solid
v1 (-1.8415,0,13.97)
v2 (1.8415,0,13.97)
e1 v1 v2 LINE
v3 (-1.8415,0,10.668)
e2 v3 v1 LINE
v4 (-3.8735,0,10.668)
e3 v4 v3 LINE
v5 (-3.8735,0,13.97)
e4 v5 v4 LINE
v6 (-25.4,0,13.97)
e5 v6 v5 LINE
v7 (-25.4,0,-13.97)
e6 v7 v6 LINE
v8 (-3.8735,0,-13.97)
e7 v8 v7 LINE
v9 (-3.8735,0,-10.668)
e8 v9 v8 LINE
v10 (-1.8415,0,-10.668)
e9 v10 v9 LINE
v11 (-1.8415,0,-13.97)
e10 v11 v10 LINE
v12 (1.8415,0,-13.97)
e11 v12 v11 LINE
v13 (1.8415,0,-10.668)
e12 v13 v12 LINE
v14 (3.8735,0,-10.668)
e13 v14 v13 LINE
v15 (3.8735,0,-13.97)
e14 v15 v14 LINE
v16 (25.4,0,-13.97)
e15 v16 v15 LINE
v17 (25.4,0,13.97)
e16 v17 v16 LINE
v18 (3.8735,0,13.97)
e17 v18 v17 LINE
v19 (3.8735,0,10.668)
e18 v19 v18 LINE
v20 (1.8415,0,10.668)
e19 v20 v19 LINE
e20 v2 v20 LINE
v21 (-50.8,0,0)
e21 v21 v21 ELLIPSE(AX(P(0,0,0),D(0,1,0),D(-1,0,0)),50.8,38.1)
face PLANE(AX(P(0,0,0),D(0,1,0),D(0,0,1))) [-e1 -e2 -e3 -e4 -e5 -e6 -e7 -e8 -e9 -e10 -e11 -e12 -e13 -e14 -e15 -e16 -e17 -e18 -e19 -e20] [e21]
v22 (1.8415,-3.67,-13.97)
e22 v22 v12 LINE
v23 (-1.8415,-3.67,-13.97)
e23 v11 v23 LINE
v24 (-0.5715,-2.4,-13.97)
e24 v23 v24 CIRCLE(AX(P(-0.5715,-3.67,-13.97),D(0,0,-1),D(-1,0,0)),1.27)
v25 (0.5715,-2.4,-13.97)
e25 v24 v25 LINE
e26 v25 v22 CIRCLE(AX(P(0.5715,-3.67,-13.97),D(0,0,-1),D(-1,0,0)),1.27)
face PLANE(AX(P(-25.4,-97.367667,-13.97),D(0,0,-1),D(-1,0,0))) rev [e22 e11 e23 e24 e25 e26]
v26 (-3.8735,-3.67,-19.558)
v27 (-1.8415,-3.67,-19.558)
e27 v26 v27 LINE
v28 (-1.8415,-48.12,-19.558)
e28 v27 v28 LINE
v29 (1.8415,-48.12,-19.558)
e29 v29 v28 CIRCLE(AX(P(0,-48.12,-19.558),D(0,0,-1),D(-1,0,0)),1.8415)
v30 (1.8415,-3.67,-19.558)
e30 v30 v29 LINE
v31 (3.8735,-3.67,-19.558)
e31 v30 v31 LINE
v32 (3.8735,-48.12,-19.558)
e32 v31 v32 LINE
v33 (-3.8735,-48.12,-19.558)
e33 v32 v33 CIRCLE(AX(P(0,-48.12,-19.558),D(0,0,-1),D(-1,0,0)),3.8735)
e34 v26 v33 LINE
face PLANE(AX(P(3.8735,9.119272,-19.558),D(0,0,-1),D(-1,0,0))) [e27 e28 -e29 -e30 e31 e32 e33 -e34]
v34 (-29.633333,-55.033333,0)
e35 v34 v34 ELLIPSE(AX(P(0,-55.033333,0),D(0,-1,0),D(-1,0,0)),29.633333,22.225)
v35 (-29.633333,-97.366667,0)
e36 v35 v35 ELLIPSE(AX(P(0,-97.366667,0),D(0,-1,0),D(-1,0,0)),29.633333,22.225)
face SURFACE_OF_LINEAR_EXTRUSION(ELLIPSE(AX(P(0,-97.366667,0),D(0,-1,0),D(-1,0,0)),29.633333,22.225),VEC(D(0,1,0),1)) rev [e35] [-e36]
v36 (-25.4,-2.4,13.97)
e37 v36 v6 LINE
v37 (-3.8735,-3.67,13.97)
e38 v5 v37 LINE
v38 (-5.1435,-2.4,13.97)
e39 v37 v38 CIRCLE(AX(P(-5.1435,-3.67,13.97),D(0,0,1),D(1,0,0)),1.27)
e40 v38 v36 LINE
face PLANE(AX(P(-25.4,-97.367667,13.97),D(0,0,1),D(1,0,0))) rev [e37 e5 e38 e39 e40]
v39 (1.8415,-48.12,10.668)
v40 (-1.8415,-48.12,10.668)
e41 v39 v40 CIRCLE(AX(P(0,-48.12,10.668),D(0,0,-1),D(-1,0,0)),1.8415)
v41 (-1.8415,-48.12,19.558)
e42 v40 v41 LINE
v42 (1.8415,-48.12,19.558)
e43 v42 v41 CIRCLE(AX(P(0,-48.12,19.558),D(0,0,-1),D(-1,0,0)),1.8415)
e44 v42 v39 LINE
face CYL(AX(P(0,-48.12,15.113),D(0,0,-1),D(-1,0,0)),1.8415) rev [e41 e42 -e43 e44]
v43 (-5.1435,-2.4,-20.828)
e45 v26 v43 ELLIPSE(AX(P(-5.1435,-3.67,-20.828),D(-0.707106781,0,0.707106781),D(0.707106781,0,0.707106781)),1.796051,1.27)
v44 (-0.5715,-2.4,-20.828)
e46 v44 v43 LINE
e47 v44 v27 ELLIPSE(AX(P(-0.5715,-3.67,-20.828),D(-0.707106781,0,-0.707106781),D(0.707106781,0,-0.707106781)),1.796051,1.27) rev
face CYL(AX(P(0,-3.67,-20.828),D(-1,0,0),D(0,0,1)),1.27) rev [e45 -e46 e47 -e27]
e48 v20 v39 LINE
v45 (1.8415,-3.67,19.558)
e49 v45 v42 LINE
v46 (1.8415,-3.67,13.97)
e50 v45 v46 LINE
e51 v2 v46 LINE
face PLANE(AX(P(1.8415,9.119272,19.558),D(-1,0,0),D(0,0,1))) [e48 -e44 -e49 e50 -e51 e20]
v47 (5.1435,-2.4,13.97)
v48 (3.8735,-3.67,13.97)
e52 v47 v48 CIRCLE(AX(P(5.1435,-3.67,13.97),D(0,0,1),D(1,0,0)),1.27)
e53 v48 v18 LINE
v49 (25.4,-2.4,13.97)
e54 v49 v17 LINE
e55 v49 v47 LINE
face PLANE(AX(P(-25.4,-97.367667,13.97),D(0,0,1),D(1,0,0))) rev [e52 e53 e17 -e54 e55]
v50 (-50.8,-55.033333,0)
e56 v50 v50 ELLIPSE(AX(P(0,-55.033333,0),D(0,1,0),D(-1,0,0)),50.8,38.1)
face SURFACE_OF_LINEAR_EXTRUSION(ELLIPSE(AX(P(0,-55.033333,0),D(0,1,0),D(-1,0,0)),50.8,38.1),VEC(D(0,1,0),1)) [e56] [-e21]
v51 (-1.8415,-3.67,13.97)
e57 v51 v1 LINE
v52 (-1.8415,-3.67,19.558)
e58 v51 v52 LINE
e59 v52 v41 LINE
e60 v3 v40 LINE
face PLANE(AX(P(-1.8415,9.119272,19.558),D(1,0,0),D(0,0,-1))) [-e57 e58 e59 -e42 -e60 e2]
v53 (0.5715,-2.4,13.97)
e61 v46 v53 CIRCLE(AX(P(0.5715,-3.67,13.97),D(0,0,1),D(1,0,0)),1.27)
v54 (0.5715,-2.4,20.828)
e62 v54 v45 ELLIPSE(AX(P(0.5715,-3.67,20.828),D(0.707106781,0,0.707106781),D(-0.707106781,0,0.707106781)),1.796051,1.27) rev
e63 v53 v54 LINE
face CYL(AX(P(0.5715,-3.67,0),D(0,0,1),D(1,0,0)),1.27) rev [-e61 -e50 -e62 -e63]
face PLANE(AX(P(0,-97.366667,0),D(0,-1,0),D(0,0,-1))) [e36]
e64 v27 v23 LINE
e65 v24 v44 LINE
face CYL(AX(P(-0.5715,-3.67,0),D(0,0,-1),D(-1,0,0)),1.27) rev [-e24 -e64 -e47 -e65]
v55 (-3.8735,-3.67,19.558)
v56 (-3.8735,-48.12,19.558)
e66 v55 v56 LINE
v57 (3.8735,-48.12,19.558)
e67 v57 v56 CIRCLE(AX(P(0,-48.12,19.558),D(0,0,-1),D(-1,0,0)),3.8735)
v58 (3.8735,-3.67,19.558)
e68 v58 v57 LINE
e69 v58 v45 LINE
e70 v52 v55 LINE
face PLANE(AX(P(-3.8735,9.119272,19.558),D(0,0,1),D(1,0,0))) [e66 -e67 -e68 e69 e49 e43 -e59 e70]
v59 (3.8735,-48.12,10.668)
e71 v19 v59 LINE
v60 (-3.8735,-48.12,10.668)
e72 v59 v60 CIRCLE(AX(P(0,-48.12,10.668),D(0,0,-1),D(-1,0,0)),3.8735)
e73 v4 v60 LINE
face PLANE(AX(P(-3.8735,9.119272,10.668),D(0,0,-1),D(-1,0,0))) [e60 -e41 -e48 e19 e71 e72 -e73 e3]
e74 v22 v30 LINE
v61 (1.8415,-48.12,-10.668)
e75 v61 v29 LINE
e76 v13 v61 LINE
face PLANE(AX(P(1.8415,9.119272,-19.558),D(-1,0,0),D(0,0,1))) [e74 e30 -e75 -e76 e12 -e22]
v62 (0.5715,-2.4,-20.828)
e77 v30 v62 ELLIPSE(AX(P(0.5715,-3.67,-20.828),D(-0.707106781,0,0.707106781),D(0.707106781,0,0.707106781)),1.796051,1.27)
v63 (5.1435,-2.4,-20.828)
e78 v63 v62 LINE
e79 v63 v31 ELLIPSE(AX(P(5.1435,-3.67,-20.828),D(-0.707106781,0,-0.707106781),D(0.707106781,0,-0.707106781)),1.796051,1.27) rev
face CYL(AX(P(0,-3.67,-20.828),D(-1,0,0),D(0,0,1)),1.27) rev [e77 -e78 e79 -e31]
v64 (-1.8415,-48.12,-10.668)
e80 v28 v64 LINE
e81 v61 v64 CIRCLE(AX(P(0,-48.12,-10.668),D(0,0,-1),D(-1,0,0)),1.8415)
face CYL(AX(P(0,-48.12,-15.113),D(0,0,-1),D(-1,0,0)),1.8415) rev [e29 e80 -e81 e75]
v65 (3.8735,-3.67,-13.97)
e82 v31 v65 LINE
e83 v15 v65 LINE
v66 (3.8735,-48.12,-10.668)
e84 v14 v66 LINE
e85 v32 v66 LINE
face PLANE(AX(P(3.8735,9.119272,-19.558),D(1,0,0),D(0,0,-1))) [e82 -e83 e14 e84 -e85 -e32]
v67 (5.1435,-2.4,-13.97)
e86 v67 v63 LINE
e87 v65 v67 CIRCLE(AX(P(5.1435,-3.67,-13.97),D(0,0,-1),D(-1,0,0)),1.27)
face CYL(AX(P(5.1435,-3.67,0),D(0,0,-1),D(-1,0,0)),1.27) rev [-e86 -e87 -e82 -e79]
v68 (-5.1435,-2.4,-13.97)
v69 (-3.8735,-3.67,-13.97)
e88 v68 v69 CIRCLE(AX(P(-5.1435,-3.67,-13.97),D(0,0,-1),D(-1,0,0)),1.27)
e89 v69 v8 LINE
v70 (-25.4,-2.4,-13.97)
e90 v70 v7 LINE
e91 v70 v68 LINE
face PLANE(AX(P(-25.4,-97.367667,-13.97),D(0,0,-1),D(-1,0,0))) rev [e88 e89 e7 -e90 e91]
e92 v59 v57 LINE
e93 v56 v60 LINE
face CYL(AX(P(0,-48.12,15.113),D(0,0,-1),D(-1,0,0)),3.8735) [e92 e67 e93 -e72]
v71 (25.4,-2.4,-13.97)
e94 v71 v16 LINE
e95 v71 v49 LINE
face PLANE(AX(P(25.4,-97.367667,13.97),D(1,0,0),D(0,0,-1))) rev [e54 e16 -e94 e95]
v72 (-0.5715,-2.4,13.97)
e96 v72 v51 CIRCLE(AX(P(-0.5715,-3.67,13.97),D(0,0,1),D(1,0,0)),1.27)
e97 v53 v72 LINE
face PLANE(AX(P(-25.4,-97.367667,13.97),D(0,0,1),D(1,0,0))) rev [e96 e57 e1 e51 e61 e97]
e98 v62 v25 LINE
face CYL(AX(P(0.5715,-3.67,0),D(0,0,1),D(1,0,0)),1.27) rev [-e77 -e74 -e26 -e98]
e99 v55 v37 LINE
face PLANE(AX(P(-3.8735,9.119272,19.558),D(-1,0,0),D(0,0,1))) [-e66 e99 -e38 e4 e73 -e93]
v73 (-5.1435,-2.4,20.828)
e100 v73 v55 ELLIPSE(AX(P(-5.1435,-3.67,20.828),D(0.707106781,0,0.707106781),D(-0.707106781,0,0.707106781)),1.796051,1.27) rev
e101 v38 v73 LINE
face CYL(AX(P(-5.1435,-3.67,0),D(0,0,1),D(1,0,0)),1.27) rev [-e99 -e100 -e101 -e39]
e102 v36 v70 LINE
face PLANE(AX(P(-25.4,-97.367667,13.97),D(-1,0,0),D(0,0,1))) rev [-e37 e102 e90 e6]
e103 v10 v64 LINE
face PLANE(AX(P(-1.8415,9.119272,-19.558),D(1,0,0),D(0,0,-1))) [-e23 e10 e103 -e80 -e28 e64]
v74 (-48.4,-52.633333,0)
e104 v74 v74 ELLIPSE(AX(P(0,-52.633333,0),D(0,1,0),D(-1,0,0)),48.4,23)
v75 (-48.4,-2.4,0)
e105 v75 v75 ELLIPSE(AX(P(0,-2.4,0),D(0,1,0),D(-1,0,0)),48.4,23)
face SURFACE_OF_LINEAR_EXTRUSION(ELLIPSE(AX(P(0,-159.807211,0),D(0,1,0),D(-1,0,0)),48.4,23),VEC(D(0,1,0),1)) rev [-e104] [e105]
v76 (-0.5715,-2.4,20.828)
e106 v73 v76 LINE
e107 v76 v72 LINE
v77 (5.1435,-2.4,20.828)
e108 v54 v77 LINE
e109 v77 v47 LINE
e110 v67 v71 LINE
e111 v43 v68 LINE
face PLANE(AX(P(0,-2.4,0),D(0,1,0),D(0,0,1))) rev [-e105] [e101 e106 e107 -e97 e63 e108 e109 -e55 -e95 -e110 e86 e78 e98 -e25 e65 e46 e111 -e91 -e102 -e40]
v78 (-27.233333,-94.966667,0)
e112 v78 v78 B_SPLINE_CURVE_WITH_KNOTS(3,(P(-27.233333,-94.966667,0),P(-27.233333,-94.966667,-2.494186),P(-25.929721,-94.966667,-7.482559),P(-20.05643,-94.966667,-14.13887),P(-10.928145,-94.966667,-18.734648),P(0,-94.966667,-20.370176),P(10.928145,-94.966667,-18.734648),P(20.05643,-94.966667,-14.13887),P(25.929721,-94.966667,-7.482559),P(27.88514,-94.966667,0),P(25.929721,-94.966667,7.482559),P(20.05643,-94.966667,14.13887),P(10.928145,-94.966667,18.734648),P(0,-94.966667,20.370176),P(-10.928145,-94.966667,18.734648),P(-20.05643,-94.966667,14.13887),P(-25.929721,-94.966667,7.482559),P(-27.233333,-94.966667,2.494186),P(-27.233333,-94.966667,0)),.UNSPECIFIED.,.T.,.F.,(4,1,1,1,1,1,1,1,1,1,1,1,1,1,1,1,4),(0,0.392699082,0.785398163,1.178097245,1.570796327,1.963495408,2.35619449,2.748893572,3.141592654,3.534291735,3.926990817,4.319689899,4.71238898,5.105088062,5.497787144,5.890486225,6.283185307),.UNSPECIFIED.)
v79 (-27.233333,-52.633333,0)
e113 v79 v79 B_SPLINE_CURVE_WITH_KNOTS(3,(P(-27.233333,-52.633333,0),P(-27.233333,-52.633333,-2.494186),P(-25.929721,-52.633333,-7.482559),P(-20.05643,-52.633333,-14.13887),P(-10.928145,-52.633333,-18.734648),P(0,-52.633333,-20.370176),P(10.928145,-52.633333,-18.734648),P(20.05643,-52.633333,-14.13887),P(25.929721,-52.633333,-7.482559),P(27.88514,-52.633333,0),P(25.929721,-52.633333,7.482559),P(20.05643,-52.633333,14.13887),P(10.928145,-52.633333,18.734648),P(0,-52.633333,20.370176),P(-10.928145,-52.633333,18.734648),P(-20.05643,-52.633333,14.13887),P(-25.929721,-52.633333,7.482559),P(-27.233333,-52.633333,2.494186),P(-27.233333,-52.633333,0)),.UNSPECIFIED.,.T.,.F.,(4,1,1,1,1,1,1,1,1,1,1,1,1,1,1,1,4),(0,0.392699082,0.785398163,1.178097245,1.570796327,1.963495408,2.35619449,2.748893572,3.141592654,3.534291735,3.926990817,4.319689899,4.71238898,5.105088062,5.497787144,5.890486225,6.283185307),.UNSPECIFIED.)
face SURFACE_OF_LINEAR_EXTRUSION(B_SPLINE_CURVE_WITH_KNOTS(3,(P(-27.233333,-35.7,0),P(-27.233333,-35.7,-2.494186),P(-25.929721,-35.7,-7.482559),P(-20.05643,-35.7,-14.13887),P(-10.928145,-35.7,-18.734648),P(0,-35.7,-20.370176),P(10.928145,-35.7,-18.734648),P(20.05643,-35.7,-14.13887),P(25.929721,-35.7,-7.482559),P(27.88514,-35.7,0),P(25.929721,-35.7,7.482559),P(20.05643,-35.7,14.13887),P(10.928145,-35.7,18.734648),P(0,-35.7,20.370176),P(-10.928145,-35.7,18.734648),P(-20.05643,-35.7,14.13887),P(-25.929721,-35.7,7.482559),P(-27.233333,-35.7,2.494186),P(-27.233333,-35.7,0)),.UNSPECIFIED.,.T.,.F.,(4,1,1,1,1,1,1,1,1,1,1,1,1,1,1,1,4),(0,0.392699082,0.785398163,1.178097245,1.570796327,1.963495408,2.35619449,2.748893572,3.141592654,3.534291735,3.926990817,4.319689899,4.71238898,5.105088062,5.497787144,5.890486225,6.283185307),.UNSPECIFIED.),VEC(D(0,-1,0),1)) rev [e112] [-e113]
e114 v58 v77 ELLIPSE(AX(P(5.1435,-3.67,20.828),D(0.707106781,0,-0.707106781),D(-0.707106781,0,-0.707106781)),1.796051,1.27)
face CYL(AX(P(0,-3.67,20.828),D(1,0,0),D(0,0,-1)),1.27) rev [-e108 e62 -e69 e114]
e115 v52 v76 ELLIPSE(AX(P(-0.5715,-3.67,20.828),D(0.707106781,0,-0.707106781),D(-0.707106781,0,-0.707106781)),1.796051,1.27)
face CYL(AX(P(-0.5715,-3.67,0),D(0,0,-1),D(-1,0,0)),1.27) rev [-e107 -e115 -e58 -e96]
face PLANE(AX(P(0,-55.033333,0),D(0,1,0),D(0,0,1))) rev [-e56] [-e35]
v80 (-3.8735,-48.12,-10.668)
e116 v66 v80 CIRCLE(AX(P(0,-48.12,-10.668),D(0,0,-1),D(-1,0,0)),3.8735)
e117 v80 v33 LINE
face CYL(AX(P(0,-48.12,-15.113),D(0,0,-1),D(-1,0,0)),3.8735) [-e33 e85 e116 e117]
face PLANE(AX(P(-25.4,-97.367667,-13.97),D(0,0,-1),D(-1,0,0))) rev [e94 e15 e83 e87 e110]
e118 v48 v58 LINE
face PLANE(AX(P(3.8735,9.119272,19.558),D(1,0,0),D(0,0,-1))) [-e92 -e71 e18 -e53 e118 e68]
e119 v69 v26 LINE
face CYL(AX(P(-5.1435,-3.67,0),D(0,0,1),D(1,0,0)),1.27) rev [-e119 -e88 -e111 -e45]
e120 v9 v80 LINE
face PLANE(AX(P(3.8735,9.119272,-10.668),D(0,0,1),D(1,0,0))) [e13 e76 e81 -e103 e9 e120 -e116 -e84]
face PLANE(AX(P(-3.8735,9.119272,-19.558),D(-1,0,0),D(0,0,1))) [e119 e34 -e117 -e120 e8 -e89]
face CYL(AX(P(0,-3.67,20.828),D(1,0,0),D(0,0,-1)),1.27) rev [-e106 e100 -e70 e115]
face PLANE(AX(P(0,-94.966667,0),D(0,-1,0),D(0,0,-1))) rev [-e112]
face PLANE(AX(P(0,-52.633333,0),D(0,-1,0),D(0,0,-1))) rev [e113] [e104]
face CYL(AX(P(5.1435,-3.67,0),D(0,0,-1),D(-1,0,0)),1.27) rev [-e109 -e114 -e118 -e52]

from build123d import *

# Parameters (mm, degrees)
SKETCH3_RX          = 50.8
SKETCH3_RY          = 38.1
BOSS_EXTRUDE1_DEPTH = 55.033333333
SKETCH4_RX          = 29.633333333
SKETCH4_RY          = 22.224999873
BOSS_EXTRUDE2_DEPTH = 42.333333249
CUT_EXTRUDE1_START  = -50.233333
SKETCH5_RX          = 48.4
SKETCH5_RY          = 23
CUT_EXTRUDE1_DEPTH  = 50.233333
CUT_EXTRUDE2_START  = -42.333333249
CUT_EXTRUDE2_DEPTH  = 42.333333249
CUT_EXTRUDE3_REACH  = 118.243
SKETCH7_W           = 50.8
SKETCH7_H           = 27.94
BOSS_EXTRUDE3_START = -2.4
SKETCH8_W           = 2.032
SKETCH8_H           = 8.89
BOSS_EXTRUDE3_DEPTH = 48.12
SKETCH11_W          = 2.032
SKETCH11_H          = 8.89
FILLET1_R           = 1.27


# Read off the part's stored shape, not the designer's step: Cut-Extrude2
with BuildPart() as part:
    # Sketch3 → Boss-Extrude1 (new body)
    with BuildSketch(Plane(origin=(0, 0, 0), x_dir=(1, 0, 0), z_dir=(0, 1, 0))):
        with Locations(Location((0, 0), (0, 0, 180))):
            Ellipse(SKETCH3_RX, SKETCH3_RY)
    extrude(amount=-BOSS_EXTRUDE1_DEPTH)

    # Sketch4 → Boss-Extrude2 (add)
    with BuildSketch(Plane.XZ.offset(55.033333333)):
        with Locations(Location((0, 0), (0, 0, 180))):
            Ellipse(SKETCH4_RX, SKETCH4_RY)
    extrude(amount=BOSS_EXTRUDE2_DEPTH)

    # Sketch5 → Cut-Extrude1 (cut)
    with BuildSketch(Plane(origin=(0, -2.400000026, 0), x_dir=(1, 0, 0), z_dir=(0, 1, 0)).offset(CUT_EXTRUDE1_START)):
        with Locations(Location((0, 0), (0, 0, -180))):
            Ellipse(SKETCH5_RX, SKETCH5_RY)
    extrude(amount=CUT_EXTRUDE1_DEPTH, mode=Mode.SUBTRACT)

    # Cut-Extrude2 outline → Cut-Extrude2 (cut)
    with BuildSketch(Plane(origin=(0, -94.966666556, 0), x_dir=(-1, 0, 0), z_dir=(0, -1, 0)).offset(CUT_EXTRUDE2_START)):
        with BuildLine():
            add(Edge.make_bspline(
                [(27.233333333, 0), (27.233333333, 2.494186188), (25.929720695, 7.482558564), (20.056429993, 14.138870445), (10.928145061, 18.734648365), (0, 20.370175627), (-10.928145061, 18.734648365), (-20.056429993, 14.138870445), (-25.929720695, 7.482558564), (-27.885139653, 0), (-25.929720695, -7.482558564), (-20.056429993, -14.138870445), (-10.928145061, -18.734648365), (0, -20.370175627), (10.928145061, -18.734648365), (20.056429993, -14.138870445), (25.929720695, -7.482558564), (27.233333333, -2.494186188), (27.233333333, 0)],
                knots=[0, 0, 0, 0, 0.392699082, 0.785398163, 1.178097245, 1.570796327, 1.963495408, 2.35619449, 2.748893572, 3.141592654, 3.534291735, 3.926990817, 4.319689899, 4.71238898, 5.105088062, 5.497787144, 5.890486225, 6.283185307, 6.283185307, 6.283185307, 6.283185307], degree=3))
        make_face()
    extrude(amount=CUT_EXTRUDE2_DEPTH, mode=Mode.SUBTRACT)

    # Sketch7 → Cut-Extrude3 (cut, up to next)
    with BuildSketch(Plane(origin=(0, 0, 0), x_dir=(1, 0, 0), z_dir=(0, 1, 0)), mode=Mode.PRIVATE) as cut_extrude3_sk1:
        Rectangle(SKETCH7_W, SKETCH7_H)
    cut_extrude3_tool1 = extrude(cut_extrude3_sk1.sketch, amount=-CUT_EXTRUDE3_REACH, mode=Mode.PRIVATE) & part.part
    add(cut_extrude3_tool1.solids().sort_by_distance((0, 0, 0))[0], mode=Mode.SUBTRACT)

    # Sketch8 → Boss-Extrude3 (add)
    with BuildSketch(Plane.XZ.offset(2.400000026).offset(BOSS_EXTRUDE3_START)):
        with Locations((-2.8575, 15.113)):
            Rectangle(SKETCH8_W, SKETCH8_H)
        with Locations((2.8575, 15.113)):
            Rectangle(SKETCH8_W, SKETCH8_H)
        with Locations((2.8575, -15.113)):
            Rectangle(SKETCH8_W, SKETCH8_H)
        with Locations((-2.8575, -15.113)):
            Rectangle(SKETCH8_W, SKETCH8_H)
    extrude(amount=BOSS_EXTRUDE3_DEPTH)

    # Sweep2: sweep along a path in Sketch10
    with BuildLine(Plane(origin=(0, 0, 15.113), x_dir=(-1, 0, 0), z_dir=(0, 0, -1))) as sweep2_path:
        ThreePointArc((-2.8575, -48.120000026), (0, -50.977500026), (2.8575, -48.120000026))
    # Sketch11 → Sweep2 (sweep)
    with BuildSketch(Plane.XZ.offset(48.120000026)):
        with Locations((-2.8575, 15.113)):
            Rectangle(SKETCH11_W, SKETCH11_H)
    sweep2 = sweep(path=sweep2_path.line)

    # Mirror2: Sweep2 across plane
    add(sweep2.mirror(Plane.XY))

    # Fillet1
    fillet1_edges = [part.edges().sort_by_distance(p)[0] for p in [
        (-2.8575, -2.400000026, 19.558),
        (-3.8735, -2.400000026, 16.764),
        (-1.8415, -2.400000026, 16.764),
        (2.8575, -2.400000026, 19.558),
        (1.8415, -2.400000026, 16.764),
        (3.8735, -2.400000026, 16.764),
        (1.8415, -2.400000026, -16.764),
        (2.8575, -2.400000026, -19.558),
        (3.8735, -2.400000026, -16.764),
        (-2.8575, -2.400000026, -19.558),
        (-1.8415, -2.400000026, -16.764),
        (-3.8735, -2.400000026, -16.764),
    ]]
    fillet(fillet1_edges, radius=FILLET1_R)


solid = part.part
